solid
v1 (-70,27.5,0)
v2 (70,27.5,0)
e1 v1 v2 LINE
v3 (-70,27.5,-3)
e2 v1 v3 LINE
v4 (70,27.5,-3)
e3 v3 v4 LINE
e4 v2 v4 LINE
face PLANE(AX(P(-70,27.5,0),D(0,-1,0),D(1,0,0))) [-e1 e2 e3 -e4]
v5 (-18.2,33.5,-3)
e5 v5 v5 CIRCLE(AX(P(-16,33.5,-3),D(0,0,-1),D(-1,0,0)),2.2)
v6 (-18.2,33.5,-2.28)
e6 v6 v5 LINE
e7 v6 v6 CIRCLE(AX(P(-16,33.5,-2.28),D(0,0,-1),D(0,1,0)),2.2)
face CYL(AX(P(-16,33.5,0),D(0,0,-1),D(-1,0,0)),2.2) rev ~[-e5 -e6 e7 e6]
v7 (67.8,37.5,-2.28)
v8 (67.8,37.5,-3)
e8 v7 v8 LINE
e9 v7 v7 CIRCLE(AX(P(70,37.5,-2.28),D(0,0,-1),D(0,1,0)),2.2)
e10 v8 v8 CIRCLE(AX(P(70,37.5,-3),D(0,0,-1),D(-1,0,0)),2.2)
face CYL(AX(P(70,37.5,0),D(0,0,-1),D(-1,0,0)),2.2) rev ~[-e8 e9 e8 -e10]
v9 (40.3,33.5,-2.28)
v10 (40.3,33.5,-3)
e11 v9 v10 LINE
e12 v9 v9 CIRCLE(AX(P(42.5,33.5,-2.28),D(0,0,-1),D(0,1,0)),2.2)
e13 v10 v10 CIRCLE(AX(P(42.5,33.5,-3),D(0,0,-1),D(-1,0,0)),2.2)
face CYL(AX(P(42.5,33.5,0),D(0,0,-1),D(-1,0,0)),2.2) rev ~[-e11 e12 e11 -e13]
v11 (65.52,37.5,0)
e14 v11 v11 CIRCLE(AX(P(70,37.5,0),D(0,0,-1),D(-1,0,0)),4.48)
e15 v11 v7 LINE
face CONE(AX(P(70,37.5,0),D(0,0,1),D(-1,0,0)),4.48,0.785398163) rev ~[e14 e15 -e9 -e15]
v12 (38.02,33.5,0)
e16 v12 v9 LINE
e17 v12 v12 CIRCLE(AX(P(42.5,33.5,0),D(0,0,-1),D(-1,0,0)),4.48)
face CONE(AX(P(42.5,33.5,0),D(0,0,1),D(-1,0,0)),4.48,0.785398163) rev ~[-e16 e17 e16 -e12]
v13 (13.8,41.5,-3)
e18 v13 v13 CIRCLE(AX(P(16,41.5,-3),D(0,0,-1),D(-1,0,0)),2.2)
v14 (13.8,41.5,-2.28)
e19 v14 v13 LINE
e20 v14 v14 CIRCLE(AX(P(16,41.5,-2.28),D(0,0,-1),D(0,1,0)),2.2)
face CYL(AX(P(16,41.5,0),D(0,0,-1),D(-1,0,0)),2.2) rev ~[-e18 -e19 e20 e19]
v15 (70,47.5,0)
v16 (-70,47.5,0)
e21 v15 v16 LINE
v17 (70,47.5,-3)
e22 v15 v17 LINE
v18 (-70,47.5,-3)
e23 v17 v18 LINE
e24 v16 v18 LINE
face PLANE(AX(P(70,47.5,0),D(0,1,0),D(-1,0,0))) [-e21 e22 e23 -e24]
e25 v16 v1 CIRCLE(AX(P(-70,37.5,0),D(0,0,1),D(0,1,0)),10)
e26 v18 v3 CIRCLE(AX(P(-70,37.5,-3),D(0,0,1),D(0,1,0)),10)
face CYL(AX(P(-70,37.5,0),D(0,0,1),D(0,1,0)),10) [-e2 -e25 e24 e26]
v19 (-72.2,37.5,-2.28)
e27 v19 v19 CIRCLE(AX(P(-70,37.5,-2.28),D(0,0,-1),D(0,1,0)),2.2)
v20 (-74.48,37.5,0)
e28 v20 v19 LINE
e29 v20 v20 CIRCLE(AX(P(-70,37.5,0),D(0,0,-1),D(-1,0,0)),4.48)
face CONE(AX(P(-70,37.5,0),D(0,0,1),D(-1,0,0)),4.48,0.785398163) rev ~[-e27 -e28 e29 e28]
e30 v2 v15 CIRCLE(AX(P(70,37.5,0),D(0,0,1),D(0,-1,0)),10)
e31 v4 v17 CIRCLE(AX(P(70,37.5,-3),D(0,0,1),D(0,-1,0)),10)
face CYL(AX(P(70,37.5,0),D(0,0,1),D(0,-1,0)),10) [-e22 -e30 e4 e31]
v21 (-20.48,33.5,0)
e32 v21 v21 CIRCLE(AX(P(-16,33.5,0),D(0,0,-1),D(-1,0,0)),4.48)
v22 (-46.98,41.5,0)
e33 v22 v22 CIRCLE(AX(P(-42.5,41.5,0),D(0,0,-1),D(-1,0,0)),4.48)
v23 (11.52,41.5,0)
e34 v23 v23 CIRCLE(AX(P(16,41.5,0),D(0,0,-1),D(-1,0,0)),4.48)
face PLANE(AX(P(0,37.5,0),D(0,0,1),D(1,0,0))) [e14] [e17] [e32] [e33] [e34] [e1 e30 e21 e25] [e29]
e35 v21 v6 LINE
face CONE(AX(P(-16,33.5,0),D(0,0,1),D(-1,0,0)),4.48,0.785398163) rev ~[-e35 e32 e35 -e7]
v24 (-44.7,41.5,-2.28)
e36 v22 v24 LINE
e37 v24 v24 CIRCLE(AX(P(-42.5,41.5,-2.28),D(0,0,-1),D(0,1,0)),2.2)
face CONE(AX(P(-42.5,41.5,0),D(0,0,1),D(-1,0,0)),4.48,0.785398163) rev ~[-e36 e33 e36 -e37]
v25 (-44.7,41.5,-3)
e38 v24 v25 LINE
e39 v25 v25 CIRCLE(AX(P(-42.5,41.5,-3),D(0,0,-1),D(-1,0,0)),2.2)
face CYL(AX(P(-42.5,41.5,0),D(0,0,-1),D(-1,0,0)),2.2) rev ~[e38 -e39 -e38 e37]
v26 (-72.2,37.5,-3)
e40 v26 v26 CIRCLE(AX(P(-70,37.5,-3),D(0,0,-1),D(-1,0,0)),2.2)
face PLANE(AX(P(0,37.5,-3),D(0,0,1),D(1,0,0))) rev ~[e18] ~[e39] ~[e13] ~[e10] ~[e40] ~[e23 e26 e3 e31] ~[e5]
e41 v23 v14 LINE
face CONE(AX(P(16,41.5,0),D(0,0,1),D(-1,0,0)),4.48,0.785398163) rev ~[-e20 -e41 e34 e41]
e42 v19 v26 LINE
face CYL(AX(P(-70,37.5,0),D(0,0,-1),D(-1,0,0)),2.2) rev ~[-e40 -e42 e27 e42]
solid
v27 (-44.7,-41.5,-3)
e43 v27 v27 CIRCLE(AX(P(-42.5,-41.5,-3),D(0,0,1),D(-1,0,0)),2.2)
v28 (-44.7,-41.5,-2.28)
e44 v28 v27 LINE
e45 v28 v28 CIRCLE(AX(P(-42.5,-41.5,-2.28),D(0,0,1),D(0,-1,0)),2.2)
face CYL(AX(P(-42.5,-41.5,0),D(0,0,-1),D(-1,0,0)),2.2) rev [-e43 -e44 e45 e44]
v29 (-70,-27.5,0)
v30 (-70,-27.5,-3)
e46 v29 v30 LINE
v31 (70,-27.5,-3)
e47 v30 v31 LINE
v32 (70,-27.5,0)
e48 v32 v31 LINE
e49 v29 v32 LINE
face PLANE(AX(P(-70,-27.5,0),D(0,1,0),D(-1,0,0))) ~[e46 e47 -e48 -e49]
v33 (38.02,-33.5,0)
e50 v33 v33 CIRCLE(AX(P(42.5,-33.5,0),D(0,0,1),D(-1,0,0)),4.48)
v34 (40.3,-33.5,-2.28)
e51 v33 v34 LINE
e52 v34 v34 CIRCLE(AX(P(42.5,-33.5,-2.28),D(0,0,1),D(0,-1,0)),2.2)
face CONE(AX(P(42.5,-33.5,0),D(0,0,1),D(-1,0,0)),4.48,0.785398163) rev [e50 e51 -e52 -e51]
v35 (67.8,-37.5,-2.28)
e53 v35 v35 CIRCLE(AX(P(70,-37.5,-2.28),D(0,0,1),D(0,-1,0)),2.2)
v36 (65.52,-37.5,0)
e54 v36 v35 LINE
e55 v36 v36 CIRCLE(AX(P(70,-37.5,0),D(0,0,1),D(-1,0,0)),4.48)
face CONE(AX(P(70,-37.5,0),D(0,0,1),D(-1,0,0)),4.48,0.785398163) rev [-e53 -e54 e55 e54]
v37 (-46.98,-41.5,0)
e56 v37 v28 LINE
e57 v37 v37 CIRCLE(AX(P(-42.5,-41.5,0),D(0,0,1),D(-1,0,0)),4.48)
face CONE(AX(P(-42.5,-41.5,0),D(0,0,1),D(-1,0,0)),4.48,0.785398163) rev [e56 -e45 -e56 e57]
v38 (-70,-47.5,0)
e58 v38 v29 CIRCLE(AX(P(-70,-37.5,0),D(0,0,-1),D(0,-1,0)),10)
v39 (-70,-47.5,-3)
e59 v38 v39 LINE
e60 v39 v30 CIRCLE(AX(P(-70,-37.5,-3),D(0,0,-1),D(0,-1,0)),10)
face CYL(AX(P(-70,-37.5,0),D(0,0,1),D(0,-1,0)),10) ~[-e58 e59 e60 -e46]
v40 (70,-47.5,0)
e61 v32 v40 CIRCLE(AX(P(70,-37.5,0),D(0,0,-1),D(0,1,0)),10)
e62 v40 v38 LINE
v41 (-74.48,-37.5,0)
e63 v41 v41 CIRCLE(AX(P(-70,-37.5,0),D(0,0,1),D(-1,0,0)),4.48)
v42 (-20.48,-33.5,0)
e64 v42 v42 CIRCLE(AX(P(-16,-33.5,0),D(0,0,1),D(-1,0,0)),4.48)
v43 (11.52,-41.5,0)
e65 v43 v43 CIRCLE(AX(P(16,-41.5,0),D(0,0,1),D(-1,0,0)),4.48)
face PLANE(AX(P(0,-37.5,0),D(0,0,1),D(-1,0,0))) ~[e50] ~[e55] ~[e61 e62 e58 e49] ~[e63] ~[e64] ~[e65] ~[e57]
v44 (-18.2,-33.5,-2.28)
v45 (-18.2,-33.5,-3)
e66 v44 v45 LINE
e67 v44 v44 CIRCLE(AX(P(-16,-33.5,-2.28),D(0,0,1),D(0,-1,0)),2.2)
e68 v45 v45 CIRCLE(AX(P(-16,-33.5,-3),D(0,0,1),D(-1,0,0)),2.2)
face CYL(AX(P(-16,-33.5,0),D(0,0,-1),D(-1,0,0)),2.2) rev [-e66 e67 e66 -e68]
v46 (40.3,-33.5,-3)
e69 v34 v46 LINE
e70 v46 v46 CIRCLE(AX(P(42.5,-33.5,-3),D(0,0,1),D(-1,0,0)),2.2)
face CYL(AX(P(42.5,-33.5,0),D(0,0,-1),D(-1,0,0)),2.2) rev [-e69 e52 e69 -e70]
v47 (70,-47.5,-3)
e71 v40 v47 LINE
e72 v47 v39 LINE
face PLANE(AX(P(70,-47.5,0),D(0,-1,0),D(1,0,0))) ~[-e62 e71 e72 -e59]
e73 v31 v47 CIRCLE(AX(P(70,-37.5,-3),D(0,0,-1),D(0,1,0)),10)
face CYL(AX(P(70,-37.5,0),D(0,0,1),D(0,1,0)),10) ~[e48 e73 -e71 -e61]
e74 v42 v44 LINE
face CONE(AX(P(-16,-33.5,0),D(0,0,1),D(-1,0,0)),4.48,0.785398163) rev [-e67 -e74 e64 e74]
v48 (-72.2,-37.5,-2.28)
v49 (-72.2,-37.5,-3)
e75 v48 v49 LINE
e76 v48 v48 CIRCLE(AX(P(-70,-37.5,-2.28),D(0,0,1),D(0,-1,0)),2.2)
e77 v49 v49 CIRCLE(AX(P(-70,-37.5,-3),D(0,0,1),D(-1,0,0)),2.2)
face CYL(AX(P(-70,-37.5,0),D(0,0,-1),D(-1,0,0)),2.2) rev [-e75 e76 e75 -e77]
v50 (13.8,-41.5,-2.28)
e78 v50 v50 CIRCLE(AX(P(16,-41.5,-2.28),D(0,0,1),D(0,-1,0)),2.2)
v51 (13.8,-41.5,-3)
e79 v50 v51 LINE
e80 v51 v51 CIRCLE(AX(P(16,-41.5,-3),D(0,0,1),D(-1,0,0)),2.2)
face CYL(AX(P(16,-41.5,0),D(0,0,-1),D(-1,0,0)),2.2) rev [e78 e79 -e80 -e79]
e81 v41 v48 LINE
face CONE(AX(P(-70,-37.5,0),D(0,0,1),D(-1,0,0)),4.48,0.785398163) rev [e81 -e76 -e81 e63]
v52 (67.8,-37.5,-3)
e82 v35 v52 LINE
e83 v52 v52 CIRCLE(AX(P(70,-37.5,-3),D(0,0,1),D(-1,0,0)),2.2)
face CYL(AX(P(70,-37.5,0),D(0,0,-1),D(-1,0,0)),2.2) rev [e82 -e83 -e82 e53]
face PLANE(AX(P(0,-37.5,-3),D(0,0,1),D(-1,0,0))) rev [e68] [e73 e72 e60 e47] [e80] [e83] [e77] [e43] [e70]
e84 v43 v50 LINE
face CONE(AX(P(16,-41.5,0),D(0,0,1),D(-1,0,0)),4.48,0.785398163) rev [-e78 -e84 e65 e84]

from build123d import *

# Parameters (mm, degrees)
F1_DEPTH       = 3
F2_D           = 4.4
F2_CSINK_D     = 8.96
F2_CSINK_ANGLE = 90


# Not quite as in the source:
# - a feature names something its author has since deleted; it is built from what else it names


with BuildPart() as f1:
    # F0 (on Top) → F1 (new body)
    with BuildSketch(Plane.XY):
        with BuildLine():
            ThreePointArc((70, 27.5), (80, 37.5), (70, 47.5))
            Line((70, 47.5), (-70, 47.5))
            ThreePointArc((-70, 47.5), (-80, 37.5), (-70, 27.5))
            Line((-70, 27.5), (70, 27.5))
        make_face()
    extrude(amount=-F1_DEPTH)

    # F2 (through all)
    with Locations(Plane.XY):
        with Locations((-70, 37.5), (-42.5, 41.5), (-16, 33.5), (16, 41.5), (42.5, 33.5), (70, 37.5)):
            CounterSinkHole(F2_D / 2, F2_CSINK_D / 2, counter_sink_angle=F2_CSINK_ANGLE)


with BuildPart() as f3_1:
    # F3: instance of F1
    add(f1.part.mirror(Plane.XZ))


solid = Compound([f1.part, f3_1.part])
